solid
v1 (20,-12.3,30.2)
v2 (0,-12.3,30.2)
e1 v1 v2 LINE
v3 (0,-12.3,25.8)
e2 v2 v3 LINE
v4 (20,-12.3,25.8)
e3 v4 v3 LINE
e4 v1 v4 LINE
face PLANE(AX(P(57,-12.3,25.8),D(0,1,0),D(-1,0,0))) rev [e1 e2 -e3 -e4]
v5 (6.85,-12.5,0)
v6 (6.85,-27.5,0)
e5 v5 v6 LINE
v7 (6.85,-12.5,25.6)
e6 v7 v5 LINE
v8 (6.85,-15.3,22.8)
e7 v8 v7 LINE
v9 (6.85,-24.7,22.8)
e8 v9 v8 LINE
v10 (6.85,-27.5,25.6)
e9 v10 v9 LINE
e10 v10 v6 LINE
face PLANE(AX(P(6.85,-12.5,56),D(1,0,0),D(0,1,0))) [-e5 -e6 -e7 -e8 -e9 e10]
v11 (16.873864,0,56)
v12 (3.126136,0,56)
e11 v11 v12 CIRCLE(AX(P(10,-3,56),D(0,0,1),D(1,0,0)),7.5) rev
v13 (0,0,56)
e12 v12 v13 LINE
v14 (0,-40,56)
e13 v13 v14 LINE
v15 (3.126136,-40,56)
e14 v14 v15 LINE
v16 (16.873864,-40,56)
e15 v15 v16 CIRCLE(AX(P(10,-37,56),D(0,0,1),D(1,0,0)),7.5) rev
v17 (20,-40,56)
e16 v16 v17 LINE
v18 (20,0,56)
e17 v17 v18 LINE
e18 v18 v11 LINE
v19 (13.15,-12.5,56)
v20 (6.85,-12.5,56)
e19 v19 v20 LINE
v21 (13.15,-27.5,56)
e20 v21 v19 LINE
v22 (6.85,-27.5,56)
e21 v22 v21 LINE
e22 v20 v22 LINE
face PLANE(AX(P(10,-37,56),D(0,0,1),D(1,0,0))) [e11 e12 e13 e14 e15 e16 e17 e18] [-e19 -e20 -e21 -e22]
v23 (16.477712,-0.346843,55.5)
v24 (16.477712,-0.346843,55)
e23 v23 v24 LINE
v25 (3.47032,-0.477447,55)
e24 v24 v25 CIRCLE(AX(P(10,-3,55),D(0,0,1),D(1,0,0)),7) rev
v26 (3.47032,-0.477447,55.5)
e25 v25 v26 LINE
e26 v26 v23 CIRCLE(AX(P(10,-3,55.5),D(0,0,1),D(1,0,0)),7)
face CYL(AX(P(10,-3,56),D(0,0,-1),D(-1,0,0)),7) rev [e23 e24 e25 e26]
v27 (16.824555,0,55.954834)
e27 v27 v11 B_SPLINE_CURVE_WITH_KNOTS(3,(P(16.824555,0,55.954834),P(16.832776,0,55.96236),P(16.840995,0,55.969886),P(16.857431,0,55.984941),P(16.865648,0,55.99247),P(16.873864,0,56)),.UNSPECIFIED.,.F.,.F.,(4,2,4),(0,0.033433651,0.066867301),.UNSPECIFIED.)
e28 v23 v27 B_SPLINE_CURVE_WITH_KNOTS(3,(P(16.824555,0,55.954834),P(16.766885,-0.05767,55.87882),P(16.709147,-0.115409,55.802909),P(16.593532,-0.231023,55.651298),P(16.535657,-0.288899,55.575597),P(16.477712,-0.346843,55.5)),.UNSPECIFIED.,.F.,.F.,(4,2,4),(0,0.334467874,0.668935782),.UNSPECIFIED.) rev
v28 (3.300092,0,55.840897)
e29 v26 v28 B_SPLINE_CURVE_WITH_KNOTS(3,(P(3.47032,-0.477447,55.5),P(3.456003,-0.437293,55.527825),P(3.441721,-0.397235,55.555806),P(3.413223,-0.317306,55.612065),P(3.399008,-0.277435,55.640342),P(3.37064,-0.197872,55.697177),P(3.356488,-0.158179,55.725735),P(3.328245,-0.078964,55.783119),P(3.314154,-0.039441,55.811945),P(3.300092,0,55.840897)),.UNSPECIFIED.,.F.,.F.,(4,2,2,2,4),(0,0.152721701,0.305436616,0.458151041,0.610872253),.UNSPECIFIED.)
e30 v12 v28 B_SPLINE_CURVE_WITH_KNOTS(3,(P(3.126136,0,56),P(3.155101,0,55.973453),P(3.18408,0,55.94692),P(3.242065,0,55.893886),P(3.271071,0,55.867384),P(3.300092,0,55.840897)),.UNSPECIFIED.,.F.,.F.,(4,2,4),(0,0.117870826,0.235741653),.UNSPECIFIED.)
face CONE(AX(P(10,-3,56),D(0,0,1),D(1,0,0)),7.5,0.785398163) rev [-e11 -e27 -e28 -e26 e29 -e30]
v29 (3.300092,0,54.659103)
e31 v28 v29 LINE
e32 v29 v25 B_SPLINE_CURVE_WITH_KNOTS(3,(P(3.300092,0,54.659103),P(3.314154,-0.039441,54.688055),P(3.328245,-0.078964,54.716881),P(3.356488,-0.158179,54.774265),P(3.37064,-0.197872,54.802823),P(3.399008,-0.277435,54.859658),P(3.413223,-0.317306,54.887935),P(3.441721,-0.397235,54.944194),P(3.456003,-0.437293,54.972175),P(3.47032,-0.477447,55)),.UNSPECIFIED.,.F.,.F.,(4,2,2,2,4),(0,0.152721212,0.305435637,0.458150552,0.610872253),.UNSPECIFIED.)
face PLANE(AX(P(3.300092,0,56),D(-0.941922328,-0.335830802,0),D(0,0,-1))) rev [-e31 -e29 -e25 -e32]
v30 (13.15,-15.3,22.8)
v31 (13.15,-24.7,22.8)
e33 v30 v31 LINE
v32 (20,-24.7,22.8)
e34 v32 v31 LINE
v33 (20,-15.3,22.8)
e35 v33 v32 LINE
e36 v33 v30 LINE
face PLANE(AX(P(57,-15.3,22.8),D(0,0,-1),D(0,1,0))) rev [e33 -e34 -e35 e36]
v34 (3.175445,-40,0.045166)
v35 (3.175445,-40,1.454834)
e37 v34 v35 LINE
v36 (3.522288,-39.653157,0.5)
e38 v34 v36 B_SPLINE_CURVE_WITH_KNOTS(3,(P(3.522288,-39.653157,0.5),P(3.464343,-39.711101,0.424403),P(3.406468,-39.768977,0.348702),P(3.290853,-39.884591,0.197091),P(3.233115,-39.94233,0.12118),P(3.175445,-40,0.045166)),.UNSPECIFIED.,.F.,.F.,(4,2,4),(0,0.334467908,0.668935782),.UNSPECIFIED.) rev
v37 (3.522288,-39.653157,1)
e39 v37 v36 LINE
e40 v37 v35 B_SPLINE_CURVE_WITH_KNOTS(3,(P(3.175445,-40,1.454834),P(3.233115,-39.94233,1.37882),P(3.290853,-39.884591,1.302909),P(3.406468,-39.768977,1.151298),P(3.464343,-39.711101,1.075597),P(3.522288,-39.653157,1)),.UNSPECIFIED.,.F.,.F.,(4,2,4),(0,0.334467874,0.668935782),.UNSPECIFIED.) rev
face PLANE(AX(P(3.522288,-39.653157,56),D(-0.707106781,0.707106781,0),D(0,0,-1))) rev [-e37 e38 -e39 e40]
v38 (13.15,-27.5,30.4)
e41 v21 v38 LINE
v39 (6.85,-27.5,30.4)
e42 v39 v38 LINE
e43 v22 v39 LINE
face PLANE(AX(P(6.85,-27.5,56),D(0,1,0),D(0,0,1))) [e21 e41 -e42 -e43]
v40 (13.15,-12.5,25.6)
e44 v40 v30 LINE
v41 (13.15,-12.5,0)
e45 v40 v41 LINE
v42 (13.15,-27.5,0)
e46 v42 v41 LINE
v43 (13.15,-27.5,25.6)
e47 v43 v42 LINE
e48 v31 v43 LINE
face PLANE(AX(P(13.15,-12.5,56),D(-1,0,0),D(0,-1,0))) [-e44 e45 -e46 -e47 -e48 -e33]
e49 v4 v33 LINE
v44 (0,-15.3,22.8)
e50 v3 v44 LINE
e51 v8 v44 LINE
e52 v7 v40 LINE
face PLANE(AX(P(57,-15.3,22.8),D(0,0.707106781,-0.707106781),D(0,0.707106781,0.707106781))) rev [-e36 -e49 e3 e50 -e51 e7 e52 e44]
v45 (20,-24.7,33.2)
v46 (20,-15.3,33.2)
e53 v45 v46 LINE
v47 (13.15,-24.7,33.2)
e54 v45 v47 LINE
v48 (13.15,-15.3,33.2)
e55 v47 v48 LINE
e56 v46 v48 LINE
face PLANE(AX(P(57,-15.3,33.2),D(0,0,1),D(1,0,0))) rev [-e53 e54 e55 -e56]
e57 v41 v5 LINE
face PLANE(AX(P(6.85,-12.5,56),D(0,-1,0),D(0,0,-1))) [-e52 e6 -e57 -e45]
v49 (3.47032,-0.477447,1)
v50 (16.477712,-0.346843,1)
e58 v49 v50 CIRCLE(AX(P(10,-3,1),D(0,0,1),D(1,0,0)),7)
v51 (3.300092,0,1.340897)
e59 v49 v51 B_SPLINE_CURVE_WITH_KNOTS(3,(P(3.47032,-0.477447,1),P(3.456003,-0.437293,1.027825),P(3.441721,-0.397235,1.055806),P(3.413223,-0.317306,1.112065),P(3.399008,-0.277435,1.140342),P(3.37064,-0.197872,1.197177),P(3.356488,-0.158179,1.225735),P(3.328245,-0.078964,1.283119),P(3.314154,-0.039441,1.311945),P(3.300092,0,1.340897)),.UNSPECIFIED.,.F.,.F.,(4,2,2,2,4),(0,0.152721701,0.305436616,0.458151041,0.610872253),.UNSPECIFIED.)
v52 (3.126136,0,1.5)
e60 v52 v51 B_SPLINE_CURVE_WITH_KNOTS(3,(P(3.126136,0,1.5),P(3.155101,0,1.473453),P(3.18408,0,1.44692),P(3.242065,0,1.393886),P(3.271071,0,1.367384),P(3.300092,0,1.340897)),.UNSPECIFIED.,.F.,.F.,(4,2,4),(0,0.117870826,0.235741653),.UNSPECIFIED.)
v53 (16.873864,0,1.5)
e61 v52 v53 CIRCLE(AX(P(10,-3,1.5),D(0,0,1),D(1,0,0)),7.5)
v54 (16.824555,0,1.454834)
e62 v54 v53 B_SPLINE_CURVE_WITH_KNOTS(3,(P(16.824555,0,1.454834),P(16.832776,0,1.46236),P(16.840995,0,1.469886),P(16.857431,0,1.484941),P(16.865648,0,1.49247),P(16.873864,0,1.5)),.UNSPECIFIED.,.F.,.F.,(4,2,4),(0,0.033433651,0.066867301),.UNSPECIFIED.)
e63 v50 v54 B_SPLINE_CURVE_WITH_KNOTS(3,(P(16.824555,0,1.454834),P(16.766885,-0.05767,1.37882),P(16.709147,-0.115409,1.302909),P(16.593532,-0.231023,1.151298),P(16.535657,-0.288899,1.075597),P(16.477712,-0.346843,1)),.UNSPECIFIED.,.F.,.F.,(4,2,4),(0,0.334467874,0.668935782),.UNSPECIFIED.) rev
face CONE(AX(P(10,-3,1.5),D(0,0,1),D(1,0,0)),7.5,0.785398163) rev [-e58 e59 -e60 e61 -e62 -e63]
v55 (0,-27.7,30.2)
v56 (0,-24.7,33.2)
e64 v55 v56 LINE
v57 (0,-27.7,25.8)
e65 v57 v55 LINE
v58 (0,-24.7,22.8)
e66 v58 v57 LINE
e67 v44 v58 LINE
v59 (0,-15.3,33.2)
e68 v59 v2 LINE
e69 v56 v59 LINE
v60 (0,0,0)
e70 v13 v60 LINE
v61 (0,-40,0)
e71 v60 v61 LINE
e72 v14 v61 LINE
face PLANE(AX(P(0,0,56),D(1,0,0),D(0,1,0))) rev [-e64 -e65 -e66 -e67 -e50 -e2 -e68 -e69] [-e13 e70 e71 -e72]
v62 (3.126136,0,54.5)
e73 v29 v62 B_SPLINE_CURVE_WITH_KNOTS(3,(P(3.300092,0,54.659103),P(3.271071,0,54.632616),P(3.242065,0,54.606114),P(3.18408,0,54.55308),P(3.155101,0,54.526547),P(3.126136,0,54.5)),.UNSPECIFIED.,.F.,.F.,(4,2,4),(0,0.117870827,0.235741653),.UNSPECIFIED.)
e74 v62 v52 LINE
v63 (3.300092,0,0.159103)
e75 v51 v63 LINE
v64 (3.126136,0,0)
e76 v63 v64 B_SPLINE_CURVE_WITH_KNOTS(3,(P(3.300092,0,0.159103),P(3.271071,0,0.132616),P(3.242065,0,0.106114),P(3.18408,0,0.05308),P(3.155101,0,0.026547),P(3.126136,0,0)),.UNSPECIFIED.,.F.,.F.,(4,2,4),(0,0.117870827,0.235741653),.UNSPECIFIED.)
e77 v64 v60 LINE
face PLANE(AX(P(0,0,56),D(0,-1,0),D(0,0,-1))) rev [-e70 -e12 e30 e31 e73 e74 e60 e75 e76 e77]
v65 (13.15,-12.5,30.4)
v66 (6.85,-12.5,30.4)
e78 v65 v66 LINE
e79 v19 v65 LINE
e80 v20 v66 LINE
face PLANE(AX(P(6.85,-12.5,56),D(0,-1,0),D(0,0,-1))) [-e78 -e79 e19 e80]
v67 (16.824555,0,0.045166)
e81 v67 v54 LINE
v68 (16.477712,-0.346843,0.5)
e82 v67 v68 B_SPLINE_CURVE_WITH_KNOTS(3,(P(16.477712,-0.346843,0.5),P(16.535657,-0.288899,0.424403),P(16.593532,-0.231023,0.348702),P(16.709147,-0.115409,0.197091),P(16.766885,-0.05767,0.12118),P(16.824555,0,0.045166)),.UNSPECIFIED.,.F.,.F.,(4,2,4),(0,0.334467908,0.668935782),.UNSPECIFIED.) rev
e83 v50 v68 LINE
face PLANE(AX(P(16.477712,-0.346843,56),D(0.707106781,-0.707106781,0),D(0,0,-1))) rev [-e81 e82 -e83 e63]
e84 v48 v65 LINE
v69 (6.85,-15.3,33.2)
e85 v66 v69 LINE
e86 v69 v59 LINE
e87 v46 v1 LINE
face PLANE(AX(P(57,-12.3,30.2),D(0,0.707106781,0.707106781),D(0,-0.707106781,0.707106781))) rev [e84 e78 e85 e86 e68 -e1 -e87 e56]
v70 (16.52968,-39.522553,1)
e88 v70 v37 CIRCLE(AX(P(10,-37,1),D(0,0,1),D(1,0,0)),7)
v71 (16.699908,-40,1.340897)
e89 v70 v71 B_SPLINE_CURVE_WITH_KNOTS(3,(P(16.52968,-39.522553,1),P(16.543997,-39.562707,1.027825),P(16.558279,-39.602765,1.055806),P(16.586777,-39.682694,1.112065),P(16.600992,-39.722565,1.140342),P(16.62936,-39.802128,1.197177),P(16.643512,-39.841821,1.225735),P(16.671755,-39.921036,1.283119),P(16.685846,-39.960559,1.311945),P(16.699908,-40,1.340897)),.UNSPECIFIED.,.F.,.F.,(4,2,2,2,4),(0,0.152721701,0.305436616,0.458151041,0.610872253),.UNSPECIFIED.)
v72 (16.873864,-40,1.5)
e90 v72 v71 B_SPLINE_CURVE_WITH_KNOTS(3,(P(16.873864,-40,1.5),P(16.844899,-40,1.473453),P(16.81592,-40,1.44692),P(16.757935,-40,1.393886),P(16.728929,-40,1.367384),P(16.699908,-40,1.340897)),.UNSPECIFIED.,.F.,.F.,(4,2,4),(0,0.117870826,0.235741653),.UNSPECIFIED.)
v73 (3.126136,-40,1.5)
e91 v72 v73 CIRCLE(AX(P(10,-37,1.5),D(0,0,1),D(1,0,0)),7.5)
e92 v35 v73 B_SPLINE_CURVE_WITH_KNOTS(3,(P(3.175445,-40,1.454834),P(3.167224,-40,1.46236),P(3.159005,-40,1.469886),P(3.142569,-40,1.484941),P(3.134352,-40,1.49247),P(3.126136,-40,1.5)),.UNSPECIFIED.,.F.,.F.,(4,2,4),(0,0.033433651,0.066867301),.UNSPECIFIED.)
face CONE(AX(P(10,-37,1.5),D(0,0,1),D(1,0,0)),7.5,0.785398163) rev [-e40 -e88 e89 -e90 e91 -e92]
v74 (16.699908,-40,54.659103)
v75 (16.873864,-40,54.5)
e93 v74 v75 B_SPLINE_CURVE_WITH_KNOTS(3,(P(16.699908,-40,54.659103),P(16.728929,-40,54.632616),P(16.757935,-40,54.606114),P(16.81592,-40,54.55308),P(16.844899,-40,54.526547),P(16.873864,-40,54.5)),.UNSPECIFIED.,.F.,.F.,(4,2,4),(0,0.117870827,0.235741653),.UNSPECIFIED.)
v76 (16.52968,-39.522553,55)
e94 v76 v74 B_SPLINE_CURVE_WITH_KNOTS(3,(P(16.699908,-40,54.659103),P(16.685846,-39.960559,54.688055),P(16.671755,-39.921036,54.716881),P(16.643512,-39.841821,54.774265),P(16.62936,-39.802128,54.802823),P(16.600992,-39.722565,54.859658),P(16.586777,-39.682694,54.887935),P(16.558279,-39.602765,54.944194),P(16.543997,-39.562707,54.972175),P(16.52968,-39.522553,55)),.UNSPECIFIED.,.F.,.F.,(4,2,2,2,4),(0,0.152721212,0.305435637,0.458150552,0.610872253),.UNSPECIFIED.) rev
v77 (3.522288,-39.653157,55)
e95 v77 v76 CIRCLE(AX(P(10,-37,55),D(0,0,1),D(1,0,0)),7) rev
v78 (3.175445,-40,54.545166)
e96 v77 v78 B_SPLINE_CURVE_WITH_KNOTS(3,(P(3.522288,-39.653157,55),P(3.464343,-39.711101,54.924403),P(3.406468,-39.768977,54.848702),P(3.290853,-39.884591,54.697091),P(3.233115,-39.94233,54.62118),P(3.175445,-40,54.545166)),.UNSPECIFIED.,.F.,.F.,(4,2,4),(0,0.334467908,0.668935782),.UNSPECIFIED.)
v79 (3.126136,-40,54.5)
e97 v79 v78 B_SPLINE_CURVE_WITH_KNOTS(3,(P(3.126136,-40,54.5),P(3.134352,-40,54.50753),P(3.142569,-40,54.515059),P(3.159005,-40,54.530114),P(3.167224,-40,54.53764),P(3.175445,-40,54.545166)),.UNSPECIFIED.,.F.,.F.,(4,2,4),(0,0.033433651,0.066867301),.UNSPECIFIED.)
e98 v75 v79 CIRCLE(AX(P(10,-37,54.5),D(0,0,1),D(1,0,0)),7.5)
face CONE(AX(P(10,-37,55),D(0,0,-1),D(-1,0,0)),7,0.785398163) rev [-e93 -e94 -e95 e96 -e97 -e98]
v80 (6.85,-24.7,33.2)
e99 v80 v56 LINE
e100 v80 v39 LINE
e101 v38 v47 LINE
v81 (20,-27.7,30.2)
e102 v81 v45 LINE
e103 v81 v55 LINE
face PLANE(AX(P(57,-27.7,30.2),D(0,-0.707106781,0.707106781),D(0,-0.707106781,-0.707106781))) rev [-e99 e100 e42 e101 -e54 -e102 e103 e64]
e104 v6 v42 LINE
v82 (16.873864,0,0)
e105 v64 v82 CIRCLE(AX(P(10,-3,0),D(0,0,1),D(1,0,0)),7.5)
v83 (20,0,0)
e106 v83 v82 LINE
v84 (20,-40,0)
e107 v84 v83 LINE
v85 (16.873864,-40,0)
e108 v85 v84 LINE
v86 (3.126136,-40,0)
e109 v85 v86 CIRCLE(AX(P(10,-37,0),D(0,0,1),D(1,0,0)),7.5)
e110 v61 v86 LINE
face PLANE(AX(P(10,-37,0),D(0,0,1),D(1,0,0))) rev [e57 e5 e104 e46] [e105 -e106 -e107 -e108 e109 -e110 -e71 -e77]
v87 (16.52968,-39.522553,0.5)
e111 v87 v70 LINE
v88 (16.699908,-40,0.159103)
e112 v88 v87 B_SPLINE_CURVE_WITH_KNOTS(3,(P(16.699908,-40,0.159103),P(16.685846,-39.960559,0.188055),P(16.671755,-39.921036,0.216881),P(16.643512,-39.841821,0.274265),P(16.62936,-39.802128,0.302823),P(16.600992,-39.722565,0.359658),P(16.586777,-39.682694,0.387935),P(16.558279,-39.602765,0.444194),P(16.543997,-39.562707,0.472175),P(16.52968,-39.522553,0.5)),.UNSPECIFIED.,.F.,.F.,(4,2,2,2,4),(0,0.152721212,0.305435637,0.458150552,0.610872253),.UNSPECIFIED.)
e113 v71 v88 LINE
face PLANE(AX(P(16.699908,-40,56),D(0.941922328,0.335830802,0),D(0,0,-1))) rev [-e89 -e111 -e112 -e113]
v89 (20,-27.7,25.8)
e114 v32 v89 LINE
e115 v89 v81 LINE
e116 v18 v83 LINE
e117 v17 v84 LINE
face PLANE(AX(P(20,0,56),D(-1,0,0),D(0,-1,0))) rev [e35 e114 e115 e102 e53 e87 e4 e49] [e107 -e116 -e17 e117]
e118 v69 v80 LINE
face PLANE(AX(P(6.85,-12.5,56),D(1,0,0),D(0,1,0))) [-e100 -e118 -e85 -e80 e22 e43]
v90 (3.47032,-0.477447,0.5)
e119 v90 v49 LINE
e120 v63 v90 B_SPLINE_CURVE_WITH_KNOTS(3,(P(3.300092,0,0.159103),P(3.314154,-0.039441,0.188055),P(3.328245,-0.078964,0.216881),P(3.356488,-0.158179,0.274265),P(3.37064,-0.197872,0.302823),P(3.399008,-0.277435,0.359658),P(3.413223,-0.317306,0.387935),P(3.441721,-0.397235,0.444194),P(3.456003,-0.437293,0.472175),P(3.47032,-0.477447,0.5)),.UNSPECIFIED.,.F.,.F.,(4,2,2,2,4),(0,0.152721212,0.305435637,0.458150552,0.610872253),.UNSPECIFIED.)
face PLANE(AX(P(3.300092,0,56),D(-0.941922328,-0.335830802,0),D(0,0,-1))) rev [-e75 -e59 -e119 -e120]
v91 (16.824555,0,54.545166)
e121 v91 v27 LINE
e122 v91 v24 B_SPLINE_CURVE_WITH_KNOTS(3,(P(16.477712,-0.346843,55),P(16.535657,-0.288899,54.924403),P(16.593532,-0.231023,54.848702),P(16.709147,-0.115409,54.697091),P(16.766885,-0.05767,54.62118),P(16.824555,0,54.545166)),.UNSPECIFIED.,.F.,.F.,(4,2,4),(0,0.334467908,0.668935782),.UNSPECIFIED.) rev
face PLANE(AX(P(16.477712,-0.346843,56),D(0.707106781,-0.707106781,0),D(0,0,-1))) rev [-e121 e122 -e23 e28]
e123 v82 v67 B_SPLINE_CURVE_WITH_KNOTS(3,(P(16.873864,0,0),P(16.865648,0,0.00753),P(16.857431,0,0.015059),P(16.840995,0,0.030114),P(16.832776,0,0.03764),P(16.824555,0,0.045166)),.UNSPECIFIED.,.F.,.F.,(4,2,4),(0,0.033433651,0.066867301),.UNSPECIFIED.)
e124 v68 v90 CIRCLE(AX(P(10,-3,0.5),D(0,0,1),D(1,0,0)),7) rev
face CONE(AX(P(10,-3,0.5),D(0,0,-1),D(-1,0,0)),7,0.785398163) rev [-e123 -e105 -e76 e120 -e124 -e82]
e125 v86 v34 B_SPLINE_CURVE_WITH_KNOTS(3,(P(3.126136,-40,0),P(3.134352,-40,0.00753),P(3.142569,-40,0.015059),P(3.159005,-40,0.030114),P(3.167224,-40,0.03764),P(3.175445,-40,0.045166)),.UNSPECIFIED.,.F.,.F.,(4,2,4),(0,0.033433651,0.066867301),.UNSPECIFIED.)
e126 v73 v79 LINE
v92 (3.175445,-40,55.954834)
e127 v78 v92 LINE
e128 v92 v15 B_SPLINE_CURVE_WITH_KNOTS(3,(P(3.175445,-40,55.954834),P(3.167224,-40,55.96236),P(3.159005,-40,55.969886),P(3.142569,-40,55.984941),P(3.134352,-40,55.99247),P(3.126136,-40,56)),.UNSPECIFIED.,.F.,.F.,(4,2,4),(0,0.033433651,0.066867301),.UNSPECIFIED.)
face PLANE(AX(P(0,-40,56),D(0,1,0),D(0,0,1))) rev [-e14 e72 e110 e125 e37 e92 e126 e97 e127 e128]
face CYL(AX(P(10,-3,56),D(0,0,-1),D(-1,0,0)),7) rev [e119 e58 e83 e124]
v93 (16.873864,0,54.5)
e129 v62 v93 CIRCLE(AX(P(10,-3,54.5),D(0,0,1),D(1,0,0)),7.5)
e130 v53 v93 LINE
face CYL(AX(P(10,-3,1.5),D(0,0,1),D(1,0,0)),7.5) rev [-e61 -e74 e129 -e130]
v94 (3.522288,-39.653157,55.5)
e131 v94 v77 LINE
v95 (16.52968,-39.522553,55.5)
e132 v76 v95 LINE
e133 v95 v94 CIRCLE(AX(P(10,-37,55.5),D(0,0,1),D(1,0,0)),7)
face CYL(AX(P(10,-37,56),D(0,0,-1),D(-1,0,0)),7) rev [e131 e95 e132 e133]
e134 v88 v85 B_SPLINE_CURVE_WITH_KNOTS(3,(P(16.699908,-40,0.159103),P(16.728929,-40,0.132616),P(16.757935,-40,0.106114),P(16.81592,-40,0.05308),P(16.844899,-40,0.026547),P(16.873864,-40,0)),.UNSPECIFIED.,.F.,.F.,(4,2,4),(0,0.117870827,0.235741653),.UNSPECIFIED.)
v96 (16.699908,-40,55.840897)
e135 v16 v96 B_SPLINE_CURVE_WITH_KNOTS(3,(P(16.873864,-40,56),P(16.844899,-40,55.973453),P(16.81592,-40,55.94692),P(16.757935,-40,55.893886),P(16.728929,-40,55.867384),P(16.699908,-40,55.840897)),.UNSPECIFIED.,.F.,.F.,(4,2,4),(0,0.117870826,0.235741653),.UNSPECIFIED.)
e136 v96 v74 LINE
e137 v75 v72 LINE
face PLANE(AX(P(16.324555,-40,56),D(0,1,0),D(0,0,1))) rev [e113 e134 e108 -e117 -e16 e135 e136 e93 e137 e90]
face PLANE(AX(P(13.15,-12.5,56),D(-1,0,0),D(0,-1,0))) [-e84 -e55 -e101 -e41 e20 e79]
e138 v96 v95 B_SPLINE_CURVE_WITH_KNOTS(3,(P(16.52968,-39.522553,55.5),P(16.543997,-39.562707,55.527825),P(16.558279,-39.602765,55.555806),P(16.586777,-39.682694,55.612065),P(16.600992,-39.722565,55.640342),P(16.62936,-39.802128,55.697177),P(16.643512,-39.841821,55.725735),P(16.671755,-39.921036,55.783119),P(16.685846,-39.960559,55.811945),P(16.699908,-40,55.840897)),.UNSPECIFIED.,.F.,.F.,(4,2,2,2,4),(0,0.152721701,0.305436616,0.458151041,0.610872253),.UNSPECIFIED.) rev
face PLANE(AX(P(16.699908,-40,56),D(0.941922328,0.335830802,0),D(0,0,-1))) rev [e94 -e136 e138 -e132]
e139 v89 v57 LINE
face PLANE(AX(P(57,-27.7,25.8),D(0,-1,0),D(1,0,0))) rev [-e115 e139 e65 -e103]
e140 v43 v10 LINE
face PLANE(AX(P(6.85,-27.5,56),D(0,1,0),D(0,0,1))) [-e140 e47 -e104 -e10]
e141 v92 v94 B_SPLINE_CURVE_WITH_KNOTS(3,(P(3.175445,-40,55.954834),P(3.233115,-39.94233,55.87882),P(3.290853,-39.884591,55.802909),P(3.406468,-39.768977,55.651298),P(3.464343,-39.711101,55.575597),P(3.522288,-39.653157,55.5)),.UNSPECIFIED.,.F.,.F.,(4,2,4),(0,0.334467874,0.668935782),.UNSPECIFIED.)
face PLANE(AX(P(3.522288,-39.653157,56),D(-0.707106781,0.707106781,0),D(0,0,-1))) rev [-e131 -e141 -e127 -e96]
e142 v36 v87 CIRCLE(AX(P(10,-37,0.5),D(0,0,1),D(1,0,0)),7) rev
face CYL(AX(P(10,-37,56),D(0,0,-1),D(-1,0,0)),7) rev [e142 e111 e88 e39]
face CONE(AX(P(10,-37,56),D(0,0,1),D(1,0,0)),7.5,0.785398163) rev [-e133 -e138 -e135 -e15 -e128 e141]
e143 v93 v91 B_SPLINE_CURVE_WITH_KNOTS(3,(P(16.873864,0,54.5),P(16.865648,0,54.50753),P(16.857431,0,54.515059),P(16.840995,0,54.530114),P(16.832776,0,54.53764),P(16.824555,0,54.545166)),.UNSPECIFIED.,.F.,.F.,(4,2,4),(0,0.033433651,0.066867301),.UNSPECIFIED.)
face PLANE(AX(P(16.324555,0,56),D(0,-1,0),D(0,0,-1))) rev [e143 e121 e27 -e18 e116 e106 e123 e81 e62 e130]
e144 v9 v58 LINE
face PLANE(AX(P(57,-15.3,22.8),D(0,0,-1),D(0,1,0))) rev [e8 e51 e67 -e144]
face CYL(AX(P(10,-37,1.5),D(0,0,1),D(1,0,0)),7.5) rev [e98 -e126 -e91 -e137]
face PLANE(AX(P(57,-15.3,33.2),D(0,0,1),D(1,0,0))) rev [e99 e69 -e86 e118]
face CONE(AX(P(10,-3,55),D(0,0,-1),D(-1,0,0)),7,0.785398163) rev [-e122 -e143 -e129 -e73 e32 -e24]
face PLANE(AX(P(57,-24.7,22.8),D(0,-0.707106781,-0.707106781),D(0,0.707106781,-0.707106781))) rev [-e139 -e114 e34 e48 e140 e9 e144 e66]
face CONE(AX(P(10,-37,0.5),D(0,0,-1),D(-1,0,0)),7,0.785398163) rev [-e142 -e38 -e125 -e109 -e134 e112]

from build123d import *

# Parameters (mm, degrees)
SKETCH_1_W          = 6.3
SKETCH_1_H          = 15
EXTRUDE_1_DEPTH     = 56
CUT_EXTRUDE_START   = -1.5
SKETCH_2_R          = 7.5
CUT_EXTRUDE_1_DEPTH = 53
CHAMFER_1_SIZE      = 0.5
CHAMFER_1_SIZE_2    = 0.37535302
CUT_EXTRUDE_5_DEPTH = 57


with BuildPart() as part:
    # 草图1 → 凸台-拉伸1 (new body)
    with BuildSketch(Plane.XY):
        with BuildLine():
            Line((16.32455532, -40), (20, -40))
            Line((20, -40), (20, 0))
            Line((20, 0), (16.32455532, 0))
            ThreePointArc((16.32455532, 0), (10, -10), (3.67544468, 0))
            Line((3.67544468, 0), (0, 0))
            Line((0, 0), (0, -40))
            Line((0, -40), (3.67544468, -40))
            ThreePointArc((3.67544468, -40), (10, -30), (16.32455532, -40))
        make_face()
        with Locations((10, -20)):
            Rectangle(SKETCH_1_W, SKETCH_1_H, mode=Mode.SUBTRACT)
    extrude(amount=EXTRUDE_1_DEPTH)

    # 草图2 → 切除-拉伸1 (cut)
    with BuildSketch(Plane.XY.offset(56).offset(CUT_EXTRUDE_START)):
        with Locations((10, -3)):
            Circle(SKETCH_2_R)
        with Locations((10, -37)):
            Circle(SKETCH_2_R)
    extrude(amount=-CUT_EXTRUDE_1_DEPTH, mode=Mode.SUBTRACT)

    # 倒角1
    # the kernel refuses this chamfer: 0.5, 0.37535302 mm, written as the material it takes off along each edge
    with BuildSketch(Plane(origin=(10, -37, 56), x_dir=(-0.8097393602715859, -0.5867897139750857, 0), z_dir=(0.5867897139750857, -0.8097393602715859, 0))) as chamfer_1_piece_1:
        Polygon((7, CHAMFER_1_SIZE), (7 + CHAMFER_1_SIZE, 0), (7, 0), align=None)
    revolve(axis=Axis((10, -37, 56), (0, 0, -1)), revolution_arc=251.859051953, mode=Mode.SUBTRACT)
    with BuildSketch(Plane(origin=(10, -37, 54.5), x_dir=(-0.8097393602715859, -0.5867897139750857, 0), z_dir=(0.5867897139750857, -0.8097393602715859, 0))) as chamfer_1_piece_2:
        Polygon((7 + CHAMFER_1_SIZE, 0), (7, -CHAMFER_1_SIZE), (7, 0), align=None)
    revolve(axis=Axis((10, -37, 54.5), (0, 0, -1)), revolution_arc=251.859051953, mode=Mode.SUBTRACT)
    with BuildSketch(Plane(origin=(10, -37, 1.5), x_dir=(-0.8097393602715859, -0.5867897139750857, 0), z_dir=(0.5867897139750857, -0.8097393602715859, 0))) as chamfer_1_piece_3:
        Polygon((7, CHAMFER_1_SIZE), (7 + CHAMFER_1_SIZE, 0), (7, 0), align=None)
    revolve(axis=Axis((10, -37, 1.5), (0, 0, -1)), revolution_arc=251.859051953, mode=Mode.SUBTRACT)
    with BuildSketch(Plane(origin=(10, -37, 0), x_dir=(-0.8097393602715859, -0.5867897139750857, 0), z_dir=(0.5867897139750857, -0.8097393602715859, 0))) as chamfer_1_piece_4:
        Polygon((7, -CHAMFER_1_SIZE), (7 + CHAMFER_1_SIZE, 0), (7, 0), align=None)
    revolve(axis=Axis((10, -37, 0), (0, 0, -1)), revolution_arc=251.859051953, mode=Mode.SUBTRACT)
    with BuildSketch(Plane(origin=(10, -3, 1.5), x_dir=(0.809739360271586, 0.5867897139750856, 0), z_dir=(-0.5867897139750856, 0.809739360271586, 0))) as chamfer_1_piece_5:
        Polygon((7, CHAMFER_1_SIZE), (7 + CHAMFER_1_SIZE, 0), (7, 0), align=None)
    revolve(axis=Axis((10, -3, 1.5), (0, 0, -1)), revolution_arc=251.859051953, mode=Mode.SUBTRACT)
    with BuildSketch(Plane(origin=(10, -3, 0), x_dir=(0.809739360271586, 0.5867897139750856, 0), z_dir=(-0.5867897139750856, 0.809739360271586, 0))) as chamfer_1_piece_6:
        Polygon((7, -CHAMFER_1_SIZE), (7 + CHAMFER_1_SIZE, 0), (7, 0), align=None)
    revolve(axis=Axis((10, -3, 0), (0, 0, -1)), revolution_arc=251.859051953, mode=Mode.SUBTRACT)
    with BuildSketch(Plane(origin=(10, -3, 56), x_dir=(0.809739360271586, 0.5867897139750855, 0), z_dir=(-0.5867897139750855, 0.809739360271586, 0))) as chamfer_1_piece_7:
        Polygon((7, CHAMFER_1_SIZE), (7 + CHAMFER_1_SIZE, 0), (7, 0), align=None)
    revolve(axis=Axis((10, -3, 56), (0, 0, -1)), revolution_arc=251.859051953, mode=Mode.SUBTRACT)
    with BuildSketch(Plane(origin=(10, -3, 54.5), x_dir=(0.809739360271586, 0.5867897139750855, 0), z_dir=(-0.5867897139750855, 0.809739360271586, 0))) as chamfer_1_piece_8:
        Polygon((7 + CHAMFER_1_SIZE, 0), (7, -CHAMFER_1_SIZE), (7, 0), align=None)
    revolve(axis=Axis((10, -3, 54.5), (0, 0, -1)), revolution_arc=251.859051953, mode=Mode.SUBTRACT)
    with BuildSketch(Plane(origin=(16.32455532, 0, 53.214158506), x_dir=(1, 0, 0), z_dir=(0, 0, 1)), Plane(origin=(3.67544468, -40, 53.214158506), x_dir=(-1, 0, 0), z_dir=(0, 0, 1))) as chamfer_1_piece_9:
        with BuildLine():
            Line((CHAMFER_1_SIZE, 0), (0.153157056, -0.346842944))
            ThreePointArc((0.153157056, -0.346842944), (0.080388037, -0.175694672), (0, 0))
            Line((0, 0), (CHAMFER_1_SIZE, 0))
        make_face()
    extrude(amount=4.071682988, mode=Mode.SUBTRACT)
    with BuildSketch(Plane(origin=(16.32455532, 0, -1.285841494), x_dir=(0.4039450974717048, -0.9147832301854768, 0), z_dir=(0, 0, 1)), Plane(origin=(3.67544468, -40, -1.285841494), x_dir=(-0.4039450974717028, 0.9147832301854776, 0), z_dir=(0, 0, 1))) as chamfer_1_piece_10:
        with BuildLine():
            Line((0.37915315, 0), (CHAMFER_1_SIZE * 0.403945097472, CHAMFER_1_SIZE * 0.914783230185))
            Line((CHAMFER_1_SIZE * 0.403945097472, CHAMFER_1_SIZE * 0.914783230185), (0, 0))
            ThreePointArc((0, 0), (0.193194893, 0.002566627), (0.37915315, 0))
        make_face()
    extrude(amount=4.071682988, mode=Mode.SUBTRACT)
    with BuildSketch(Plane(origin=(3.67544468, 0, -1.336191622), x_dir=(-1, 0, 0), z_dir=(0, 0, 1)), Plane(origin=(3.67544468, 0, 53.163808378), x_dir=(-1, 0, 0), z_dir=(0, 0, 1)), Plane(origin=(16.32455532, -40, -1.336191622), x_dir=(1, 0, 0), z_dir=(0, 0, 1)), Plane(origin=(16.32455532, -40, 53.163808378), x_dir=(1, 0, 0), z_dir=(0, 0, 1))) as chamfer_1_piece_11:
        with BuildLine():
            Line((CHAMFER_1_SIZE_2, 0), (0.205125138, 0.477447103))
            ThreePointArc((0.205125138, 0.477447103), (0.109888705, 0.243565694), (0, 0))
            Line((0, 0), (CHAMFER_1_SIZE_2, 0))
        make_face()
    extrude(amount=4.172383245, mode=Mode.SUBTRACT)

    # 草图3 → 切除-拉伸5 (cut)
    with BuildSketch(Plane.ZY):
        Polygon((25.8, -12.3), (30.2, -12.3), (33.2, -15.3), (33.2, -24.7), (30.2, -27.7), (25.8, -27.7), (22.8, -24.7), (22.8, -15.3), align=None)
    extrude(amount=-CUT_EXTRUDE_5_DEPTH, mode=Mode.SUBTRACT)


solid = part.part
